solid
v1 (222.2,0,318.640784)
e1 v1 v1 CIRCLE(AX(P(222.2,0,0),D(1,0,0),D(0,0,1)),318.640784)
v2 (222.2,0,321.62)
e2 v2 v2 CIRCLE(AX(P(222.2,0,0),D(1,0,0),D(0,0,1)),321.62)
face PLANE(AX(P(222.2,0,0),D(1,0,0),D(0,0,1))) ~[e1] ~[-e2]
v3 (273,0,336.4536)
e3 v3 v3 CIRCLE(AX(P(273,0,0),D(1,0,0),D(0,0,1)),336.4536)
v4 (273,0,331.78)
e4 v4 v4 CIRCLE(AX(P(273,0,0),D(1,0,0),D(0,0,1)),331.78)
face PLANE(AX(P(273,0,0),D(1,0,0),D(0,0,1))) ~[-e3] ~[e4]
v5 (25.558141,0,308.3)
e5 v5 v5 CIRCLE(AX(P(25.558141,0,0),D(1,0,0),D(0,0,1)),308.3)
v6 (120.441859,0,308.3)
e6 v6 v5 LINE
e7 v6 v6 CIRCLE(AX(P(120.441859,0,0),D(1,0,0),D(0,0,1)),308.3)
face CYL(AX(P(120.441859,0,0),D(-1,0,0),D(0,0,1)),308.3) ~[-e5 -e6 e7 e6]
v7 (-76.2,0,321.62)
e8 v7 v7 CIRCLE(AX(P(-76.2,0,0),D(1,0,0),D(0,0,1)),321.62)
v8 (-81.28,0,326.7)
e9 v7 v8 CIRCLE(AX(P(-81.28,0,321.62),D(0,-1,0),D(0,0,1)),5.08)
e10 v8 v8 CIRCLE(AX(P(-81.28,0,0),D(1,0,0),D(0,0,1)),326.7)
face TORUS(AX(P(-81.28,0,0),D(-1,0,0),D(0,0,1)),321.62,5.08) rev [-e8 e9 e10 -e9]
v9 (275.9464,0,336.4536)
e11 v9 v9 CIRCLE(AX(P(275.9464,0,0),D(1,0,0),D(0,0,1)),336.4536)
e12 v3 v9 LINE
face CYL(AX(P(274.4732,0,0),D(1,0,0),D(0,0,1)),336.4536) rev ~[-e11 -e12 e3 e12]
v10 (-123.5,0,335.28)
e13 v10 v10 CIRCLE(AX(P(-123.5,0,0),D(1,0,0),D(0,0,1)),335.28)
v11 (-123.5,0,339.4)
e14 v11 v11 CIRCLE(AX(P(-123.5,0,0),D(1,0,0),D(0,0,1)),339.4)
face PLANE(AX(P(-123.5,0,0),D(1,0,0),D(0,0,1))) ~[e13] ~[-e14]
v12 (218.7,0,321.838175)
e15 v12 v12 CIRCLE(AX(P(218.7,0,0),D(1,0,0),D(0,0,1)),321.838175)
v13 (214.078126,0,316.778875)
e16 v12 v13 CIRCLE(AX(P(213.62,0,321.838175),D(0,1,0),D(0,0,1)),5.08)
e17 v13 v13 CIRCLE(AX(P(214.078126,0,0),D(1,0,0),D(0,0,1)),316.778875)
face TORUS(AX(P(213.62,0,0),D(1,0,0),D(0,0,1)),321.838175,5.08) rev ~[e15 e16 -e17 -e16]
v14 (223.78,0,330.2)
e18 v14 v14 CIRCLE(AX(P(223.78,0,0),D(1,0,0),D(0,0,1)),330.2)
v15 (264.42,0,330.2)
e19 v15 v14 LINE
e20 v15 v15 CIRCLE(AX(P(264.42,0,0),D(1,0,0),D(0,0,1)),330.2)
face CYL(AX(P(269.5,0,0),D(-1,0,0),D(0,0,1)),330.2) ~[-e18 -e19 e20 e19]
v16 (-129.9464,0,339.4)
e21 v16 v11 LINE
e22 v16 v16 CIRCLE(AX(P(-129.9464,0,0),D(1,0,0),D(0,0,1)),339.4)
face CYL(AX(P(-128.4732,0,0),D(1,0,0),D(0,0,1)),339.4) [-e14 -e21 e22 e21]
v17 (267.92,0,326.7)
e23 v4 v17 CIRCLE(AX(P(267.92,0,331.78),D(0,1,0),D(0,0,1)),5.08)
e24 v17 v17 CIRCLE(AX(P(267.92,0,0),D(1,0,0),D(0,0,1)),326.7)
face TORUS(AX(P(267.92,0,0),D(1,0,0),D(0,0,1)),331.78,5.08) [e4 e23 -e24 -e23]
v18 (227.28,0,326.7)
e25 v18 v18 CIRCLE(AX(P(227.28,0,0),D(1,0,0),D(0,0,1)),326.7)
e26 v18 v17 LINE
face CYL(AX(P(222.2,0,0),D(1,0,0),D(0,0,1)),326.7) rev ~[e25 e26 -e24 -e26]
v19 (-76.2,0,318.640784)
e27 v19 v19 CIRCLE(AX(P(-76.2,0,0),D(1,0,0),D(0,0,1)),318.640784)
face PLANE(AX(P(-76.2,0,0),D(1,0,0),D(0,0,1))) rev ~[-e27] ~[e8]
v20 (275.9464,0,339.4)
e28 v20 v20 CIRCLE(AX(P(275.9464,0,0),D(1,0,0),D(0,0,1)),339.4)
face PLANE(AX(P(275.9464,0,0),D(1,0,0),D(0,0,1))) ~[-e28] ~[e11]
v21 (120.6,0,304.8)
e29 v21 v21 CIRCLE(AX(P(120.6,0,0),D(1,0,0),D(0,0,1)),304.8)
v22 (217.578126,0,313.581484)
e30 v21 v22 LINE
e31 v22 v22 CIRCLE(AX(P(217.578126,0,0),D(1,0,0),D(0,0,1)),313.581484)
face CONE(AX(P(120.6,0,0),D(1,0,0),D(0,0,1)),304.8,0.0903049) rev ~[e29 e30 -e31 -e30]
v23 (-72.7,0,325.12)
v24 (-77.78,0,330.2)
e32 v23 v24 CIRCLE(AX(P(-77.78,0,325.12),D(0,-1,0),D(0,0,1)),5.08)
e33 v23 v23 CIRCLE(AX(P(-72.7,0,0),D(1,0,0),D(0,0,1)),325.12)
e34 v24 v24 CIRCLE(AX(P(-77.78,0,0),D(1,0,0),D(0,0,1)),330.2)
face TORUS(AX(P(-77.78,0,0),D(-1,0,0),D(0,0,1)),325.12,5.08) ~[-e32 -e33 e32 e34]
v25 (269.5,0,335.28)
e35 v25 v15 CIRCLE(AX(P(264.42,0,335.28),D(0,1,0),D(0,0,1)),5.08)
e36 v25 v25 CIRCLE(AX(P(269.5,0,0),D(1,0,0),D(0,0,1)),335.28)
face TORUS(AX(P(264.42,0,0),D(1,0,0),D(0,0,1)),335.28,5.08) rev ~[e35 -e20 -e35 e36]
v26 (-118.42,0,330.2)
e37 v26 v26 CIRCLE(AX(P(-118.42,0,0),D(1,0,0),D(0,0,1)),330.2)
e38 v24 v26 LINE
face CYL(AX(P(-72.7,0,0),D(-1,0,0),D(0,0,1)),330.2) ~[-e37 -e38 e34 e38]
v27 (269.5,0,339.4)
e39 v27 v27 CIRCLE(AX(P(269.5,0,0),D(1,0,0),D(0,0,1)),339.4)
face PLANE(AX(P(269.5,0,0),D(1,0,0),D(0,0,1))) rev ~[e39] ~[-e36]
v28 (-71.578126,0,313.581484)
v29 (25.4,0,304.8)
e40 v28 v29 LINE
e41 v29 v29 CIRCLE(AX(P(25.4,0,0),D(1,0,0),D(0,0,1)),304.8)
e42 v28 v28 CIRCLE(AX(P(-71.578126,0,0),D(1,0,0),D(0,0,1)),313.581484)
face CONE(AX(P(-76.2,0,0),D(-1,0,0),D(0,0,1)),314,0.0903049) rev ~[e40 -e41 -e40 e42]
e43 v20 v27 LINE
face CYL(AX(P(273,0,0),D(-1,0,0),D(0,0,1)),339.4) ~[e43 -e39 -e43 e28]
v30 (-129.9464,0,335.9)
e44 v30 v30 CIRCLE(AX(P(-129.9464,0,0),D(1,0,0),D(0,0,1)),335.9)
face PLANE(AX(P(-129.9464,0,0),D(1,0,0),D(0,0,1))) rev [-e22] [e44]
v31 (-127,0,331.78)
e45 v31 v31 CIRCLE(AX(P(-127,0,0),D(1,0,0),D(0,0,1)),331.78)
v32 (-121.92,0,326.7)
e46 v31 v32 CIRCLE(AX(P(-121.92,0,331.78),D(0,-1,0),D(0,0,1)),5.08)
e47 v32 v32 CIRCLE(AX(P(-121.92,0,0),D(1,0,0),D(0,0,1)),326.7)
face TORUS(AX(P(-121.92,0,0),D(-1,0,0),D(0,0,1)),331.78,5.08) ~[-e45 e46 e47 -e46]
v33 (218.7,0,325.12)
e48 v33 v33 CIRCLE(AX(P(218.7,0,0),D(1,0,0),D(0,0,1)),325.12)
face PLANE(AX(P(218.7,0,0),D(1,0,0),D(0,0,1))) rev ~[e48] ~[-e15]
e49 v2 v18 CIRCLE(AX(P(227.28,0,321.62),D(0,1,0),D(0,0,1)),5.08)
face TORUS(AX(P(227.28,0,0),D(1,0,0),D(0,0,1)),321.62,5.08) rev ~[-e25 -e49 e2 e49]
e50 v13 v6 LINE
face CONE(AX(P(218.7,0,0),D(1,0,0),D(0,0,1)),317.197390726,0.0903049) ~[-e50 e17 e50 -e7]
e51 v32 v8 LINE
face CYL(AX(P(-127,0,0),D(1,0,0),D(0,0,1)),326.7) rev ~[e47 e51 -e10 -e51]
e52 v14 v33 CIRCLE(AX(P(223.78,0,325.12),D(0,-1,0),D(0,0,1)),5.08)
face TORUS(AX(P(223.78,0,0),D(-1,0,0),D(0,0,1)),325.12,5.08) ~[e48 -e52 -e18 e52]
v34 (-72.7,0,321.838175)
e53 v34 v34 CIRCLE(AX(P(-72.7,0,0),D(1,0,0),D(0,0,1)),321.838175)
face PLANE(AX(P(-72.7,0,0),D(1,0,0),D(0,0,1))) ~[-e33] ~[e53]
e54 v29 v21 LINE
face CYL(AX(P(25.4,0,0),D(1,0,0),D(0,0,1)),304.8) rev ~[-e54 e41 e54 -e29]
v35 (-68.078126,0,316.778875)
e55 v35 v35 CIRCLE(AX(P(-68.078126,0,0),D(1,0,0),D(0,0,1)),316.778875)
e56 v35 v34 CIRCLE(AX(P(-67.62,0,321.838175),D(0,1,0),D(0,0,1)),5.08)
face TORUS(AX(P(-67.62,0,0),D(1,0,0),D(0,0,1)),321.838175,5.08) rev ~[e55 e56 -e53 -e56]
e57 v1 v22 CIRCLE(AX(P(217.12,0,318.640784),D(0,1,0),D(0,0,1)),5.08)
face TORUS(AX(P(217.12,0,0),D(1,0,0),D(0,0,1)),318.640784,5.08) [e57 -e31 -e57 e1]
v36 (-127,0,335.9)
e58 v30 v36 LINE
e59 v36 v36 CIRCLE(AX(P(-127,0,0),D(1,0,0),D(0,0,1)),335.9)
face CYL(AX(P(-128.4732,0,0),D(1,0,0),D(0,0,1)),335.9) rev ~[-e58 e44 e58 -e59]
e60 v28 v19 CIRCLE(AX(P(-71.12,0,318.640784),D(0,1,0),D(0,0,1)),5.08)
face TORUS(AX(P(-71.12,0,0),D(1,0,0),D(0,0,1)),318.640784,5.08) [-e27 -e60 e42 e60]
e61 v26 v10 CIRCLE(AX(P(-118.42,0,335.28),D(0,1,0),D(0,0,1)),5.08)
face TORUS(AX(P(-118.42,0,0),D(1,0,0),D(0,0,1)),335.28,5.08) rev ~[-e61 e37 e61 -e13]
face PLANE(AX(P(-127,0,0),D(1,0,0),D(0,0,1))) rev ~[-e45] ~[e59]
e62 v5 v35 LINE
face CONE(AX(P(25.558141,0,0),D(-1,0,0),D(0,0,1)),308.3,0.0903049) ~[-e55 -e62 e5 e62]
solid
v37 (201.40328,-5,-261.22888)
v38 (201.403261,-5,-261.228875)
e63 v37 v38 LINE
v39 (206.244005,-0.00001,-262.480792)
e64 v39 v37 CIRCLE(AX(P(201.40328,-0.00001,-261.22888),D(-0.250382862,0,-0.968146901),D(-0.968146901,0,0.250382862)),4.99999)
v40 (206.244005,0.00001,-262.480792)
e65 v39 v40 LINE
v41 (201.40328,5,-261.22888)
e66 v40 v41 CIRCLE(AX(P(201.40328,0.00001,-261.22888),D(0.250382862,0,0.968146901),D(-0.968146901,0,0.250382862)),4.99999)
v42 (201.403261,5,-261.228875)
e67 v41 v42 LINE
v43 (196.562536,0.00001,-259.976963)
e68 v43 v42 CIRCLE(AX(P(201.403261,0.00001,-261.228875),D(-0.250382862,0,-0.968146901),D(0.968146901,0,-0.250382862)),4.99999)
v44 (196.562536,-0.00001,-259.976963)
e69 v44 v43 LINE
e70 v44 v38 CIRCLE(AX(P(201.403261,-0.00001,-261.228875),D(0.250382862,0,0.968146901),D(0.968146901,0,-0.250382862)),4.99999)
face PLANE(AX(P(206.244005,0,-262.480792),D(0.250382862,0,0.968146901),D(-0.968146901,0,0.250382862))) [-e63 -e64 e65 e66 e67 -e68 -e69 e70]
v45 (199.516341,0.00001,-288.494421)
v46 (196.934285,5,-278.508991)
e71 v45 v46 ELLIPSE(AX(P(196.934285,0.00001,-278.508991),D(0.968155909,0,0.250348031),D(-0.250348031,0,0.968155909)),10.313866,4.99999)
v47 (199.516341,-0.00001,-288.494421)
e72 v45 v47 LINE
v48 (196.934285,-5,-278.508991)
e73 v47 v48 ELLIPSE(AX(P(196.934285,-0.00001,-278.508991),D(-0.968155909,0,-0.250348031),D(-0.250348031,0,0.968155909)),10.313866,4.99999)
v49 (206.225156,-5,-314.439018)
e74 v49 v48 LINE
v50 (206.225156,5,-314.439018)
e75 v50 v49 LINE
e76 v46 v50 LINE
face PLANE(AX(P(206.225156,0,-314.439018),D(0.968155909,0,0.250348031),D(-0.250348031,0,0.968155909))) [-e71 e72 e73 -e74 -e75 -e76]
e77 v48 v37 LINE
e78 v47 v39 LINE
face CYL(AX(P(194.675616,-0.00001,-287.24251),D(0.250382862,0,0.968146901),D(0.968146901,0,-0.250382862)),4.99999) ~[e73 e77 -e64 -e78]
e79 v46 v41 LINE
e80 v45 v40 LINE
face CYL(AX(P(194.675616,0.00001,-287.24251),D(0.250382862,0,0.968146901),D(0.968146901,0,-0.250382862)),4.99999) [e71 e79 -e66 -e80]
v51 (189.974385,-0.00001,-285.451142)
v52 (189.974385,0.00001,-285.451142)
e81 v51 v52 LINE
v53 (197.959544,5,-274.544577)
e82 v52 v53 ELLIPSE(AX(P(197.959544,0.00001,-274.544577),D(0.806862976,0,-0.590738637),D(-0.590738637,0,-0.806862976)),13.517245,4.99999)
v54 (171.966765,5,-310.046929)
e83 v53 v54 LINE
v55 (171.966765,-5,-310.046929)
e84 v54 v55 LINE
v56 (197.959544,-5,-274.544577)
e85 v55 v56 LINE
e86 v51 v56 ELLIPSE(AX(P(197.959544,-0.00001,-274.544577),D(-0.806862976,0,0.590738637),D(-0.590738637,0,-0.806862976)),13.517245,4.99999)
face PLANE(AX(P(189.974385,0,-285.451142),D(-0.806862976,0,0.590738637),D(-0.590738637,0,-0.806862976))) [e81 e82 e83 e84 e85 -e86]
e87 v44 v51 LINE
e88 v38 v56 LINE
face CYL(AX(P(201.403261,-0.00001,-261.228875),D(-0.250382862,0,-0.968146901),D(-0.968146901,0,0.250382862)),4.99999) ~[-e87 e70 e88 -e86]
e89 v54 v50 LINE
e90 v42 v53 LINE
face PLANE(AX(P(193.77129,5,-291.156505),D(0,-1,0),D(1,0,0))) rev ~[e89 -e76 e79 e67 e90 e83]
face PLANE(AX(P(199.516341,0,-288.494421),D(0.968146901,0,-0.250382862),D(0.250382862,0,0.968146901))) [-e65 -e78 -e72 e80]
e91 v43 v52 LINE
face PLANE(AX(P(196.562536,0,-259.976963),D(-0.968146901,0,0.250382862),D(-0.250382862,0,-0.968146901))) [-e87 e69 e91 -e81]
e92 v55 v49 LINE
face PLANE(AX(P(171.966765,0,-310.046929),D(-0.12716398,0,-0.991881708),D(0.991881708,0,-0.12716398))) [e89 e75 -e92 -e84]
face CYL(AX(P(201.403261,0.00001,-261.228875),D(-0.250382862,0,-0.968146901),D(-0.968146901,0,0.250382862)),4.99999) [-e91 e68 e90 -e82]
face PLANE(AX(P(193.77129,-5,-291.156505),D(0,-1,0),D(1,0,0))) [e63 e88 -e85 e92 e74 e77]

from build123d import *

# Parameters (mm, degrees)
F1_W     = 2.9464
F1_H     = 3.5
F1_H_2   = 2.9464
F6_DEPTH = 5
F7_R     = 4.99999
F8_R     = 5.08
F9_R     = 5.08
F10_R    = 5.08
F11_R    = 5.08
F12_R    = 5.08
F13_R    = 5.08


# Not quite as in the source:
# - a fillet or chamfer is up to 0.001 mm smaller than in the source, because OpenCascade refuses the exact size


with BuildPart() as f3:
    # F0 (on Front) → F3 (revolve)
    with BuildSketch(Plane.XZ):
        Polygon((-123.5, 339.4), (-127, 339.4), (-127, 326.7), (-76.2, 326.7), (-76.2, 314), (25.4, 304.8), (120.6, 304.8), (222.2, 314), (222.2, 326.7), (273, 326.7), (273, 339.4), (269.5, 339.4), (269.5, 330.2), (218.7, 330.2), (218.7, 317.1973907258), (120.4418589413, 308.3), (25.5581410587, 308.3), (-72.7, 317.1973907258), (-72.7, 330.2), (-123.5, 330.2), align=None)
    revolve(axis=Axis((196.6187655926, 0, 0), (1, 0, 0)))

    # F1 (on Front) → F4 (revolve)
    with BuildSketch(Plane.XZ):
        with Locations((-128.4732, 337.65)):
            Rectangle(F1_W, F1_H)
        with Locations((274.4732, 337.9268)):
            Rectangle(F1_W, F1_H_2)
    revolve(axis=Axis((196.6187655926, 0, 0), (1, 0, 0)))

    # F8
    f8_edges = [f3.edges().sort_by_distance(p)[0] for p in [
        (222.2, 0, -314),
        (-76.2, 0, -314),
    ]]
    fillet(f8_edges, radius=F8_R)

    # F9
    f9_edges = [f3.edges().sort_by_distance(p)[0] for p in [
        (222.2, 0, -326.7),
        (-76.2, 0, -326.7),
    ]]
    fillet(f9_edges, radius=F9_R)

    # F10
    f10_edges = [f3.edges().sort_by_distance(p)[0] for p in [
        (-72.7, 0, -330.2),
        (218.7, 0, -330.2),
    ]]
    fillet(f10_edges, radius=F10_R)

    # F11
    f11_edges = [f3.edges().sort_by_distance(p)[0] for p in [
        (273, 0, -326.7),
        (-127, 0, -326.7),
    ]]
    fillet(f11_edges, radius=F11_R)

    # F12
    f12_edges = [f3.edges().sort_by_distance(p)[0] for p in [
        (269.5, 0, -330.2),
        (-123.5, 0, -330.2),
    ]]
    fillet(f12_edges, radius=F12_R)

    # F13
    f13_edges = [f3.edges().sort_by_distance(p)[0] for p in [
        (-72.7, 0, -317.197391),
        (218.7, 0, -317.197391),
    ]]
    fillet(f13_edges, radius=F13_R)


with BuildPart() as f6:
    # F5 (on Front) → F6 (new body, symmetric)
    with BuildSketch(Plane.XZ):
        Polygon((189.974385003, -285.451141925), (171.9667653221, -310.0469287736), (206.225155724, -314.4390183103), (199.5163408505, -288.4944213569), (206.2440047511, -262.4807920826), (196.5625357394, -259.9769634593), align=None)
    extrude(amount=F6_DEPTH, both=True)

    # F7 (radius 5 in the source; OpenCascade refuses exactly that, so slightly less here)
    f7_edges = [f6.edges().sort_by_distance(p)[0] for p in [
        (193.26846, -5, -272.714053),
        (202.880173, -5, -275.487607),
        (202.880173, 5, -275.487607),
        (193.26846, 5, -272.714053),
    ]]
    fillet(f7_edges, radius=F7_R)


solid = Compound([f3.part, f6.part])
